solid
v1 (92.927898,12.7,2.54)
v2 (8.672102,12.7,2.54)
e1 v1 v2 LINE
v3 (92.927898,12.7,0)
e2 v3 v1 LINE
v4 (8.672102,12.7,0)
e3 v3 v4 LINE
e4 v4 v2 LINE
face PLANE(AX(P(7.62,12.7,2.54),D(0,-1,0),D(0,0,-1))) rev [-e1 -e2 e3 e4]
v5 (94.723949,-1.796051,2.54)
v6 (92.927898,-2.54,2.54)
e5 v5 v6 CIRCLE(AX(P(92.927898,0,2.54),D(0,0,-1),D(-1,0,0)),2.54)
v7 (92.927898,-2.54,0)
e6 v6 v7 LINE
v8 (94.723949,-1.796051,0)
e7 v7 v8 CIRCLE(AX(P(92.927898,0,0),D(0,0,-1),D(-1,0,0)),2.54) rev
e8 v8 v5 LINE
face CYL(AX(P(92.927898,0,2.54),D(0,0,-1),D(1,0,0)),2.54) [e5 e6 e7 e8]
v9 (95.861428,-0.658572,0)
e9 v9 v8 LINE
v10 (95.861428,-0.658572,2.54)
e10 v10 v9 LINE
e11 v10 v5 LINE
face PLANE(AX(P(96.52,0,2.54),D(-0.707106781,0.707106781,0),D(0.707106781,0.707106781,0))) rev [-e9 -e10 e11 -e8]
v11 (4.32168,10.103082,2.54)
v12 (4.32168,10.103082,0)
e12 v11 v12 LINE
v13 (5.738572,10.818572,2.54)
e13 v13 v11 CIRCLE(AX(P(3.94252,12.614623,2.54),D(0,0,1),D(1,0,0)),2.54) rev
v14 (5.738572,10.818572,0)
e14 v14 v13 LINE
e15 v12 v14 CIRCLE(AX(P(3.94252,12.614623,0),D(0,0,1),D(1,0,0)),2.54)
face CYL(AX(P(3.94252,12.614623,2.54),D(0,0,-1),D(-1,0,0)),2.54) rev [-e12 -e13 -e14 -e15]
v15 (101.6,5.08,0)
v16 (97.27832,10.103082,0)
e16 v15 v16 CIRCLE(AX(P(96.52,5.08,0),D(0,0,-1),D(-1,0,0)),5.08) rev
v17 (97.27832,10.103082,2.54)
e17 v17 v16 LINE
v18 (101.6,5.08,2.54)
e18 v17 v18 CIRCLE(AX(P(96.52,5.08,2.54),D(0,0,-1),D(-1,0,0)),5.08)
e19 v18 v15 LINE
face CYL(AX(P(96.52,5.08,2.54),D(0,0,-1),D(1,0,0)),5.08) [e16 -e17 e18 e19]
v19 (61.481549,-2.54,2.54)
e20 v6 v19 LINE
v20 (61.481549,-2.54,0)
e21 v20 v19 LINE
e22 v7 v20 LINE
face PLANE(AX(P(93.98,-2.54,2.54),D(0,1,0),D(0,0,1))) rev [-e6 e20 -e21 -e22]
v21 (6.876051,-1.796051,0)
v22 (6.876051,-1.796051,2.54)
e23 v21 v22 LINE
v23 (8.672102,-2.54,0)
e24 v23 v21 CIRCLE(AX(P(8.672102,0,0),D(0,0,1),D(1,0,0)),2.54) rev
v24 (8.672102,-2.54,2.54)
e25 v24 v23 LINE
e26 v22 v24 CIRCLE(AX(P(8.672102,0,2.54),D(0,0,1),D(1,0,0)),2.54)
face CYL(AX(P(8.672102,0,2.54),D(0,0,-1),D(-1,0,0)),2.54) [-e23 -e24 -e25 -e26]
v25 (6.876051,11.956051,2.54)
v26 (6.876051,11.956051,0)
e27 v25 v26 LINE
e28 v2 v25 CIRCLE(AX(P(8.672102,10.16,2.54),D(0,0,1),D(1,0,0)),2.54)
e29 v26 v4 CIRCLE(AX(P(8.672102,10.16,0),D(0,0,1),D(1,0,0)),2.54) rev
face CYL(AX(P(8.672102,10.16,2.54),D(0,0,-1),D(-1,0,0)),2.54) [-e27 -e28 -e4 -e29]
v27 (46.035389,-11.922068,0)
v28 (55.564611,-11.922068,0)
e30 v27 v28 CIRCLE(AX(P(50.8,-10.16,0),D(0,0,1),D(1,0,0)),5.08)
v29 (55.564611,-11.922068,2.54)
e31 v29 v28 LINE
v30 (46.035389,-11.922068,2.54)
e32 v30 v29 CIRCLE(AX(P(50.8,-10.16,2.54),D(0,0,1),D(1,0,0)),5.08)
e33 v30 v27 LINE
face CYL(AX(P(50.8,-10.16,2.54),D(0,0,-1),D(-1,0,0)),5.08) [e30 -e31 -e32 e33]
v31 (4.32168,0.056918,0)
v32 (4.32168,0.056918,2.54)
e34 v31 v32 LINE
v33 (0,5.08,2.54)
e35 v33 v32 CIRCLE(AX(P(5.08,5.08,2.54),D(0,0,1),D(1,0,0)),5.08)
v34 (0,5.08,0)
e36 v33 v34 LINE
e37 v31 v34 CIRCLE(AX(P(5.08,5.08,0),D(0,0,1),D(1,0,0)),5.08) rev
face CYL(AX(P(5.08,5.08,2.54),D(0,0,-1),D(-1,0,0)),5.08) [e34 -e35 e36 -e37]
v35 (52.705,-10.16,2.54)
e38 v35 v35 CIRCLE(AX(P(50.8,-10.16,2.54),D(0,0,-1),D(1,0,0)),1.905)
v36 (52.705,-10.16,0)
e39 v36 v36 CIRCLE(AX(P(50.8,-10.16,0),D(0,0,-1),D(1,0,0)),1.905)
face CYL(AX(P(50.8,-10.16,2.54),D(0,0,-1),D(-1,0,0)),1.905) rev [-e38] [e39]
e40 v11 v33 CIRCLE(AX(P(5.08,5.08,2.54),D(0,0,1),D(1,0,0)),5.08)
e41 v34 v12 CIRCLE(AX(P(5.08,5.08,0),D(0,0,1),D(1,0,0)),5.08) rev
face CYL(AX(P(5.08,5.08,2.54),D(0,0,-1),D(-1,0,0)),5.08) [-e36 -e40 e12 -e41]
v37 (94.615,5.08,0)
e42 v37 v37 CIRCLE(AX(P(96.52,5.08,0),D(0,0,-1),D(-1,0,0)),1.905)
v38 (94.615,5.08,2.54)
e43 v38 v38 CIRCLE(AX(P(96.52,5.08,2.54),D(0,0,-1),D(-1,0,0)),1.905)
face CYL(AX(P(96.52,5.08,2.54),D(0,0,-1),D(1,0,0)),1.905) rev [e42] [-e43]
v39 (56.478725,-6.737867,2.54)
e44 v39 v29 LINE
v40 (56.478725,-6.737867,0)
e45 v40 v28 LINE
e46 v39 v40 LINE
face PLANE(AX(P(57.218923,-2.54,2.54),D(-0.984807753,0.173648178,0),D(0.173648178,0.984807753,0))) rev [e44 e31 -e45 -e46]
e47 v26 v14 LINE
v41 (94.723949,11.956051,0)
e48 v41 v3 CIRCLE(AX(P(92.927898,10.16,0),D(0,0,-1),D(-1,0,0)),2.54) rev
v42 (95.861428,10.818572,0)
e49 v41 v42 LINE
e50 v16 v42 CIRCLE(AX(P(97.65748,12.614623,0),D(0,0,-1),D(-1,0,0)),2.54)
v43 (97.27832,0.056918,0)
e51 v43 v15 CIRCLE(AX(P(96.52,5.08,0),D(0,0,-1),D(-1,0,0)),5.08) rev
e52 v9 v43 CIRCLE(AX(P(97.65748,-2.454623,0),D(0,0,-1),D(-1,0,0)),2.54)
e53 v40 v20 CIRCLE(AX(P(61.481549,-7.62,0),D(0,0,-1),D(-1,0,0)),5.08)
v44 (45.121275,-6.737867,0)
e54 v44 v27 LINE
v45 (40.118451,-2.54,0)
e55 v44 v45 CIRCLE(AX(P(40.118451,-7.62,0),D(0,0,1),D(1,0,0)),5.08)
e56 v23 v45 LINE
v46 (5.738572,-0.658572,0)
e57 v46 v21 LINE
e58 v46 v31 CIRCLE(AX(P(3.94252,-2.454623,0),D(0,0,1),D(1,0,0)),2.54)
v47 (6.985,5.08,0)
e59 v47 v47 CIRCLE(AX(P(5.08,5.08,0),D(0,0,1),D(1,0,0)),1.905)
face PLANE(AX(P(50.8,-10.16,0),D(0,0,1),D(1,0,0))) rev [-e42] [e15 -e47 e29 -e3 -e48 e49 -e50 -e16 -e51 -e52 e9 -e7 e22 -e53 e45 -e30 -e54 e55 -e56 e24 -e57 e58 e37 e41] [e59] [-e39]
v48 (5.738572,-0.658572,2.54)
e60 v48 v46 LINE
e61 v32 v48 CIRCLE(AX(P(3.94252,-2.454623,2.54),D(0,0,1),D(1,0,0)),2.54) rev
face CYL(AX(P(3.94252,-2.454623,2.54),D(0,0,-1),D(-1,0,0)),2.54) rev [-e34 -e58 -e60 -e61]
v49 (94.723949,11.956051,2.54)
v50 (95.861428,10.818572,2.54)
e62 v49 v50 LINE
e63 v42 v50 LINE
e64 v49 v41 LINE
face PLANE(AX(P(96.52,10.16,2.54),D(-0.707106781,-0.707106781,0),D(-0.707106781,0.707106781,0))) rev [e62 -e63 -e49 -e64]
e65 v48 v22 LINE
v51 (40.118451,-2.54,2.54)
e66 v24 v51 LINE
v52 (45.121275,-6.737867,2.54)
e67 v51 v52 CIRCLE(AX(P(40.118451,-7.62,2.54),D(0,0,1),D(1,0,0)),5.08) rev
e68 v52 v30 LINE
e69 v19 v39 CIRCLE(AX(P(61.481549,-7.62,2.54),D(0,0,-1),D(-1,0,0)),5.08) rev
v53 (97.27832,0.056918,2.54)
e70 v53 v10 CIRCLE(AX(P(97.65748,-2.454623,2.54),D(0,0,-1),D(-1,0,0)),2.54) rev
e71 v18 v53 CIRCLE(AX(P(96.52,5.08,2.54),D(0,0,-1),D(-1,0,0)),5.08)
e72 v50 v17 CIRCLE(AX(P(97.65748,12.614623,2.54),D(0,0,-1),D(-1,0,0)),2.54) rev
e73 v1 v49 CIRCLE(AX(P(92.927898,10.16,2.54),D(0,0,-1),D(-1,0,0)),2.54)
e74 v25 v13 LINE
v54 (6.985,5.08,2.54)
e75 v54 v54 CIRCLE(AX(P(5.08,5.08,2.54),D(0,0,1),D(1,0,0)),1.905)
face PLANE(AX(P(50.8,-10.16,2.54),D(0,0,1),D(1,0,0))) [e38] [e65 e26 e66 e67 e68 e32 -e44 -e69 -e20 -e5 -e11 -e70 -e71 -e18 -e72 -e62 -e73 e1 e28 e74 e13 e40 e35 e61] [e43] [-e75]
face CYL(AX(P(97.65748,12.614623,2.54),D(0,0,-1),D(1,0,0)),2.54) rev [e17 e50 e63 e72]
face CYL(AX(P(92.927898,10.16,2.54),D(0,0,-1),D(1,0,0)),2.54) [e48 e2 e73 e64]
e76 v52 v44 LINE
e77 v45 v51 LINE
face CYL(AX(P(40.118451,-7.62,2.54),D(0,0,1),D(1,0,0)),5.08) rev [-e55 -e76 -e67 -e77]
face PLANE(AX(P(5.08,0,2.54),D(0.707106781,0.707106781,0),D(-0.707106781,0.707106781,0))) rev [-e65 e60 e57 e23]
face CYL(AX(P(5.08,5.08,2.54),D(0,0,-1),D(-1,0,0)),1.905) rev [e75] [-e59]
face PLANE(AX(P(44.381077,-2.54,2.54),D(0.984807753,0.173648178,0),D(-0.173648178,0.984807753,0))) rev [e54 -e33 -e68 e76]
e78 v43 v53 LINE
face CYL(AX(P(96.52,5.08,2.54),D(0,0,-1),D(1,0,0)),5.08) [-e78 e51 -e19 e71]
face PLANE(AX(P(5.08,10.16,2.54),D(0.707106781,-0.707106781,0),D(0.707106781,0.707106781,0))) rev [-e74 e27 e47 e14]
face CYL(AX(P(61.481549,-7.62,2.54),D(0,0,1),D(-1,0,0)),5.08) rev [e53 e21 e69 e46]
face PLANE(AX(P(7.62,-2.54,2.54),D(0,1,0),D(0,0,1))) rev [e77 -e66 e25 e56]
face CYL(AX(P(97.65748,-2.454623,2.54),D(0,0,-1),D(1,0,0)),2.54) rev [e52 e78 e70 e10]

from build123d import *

# Parameters (mm, degrees)
SKETCH1_R           = 1.905
BOSS_EXTRUDE1_DEPTH = 2.54
FILLET5_R           = 5.08
FILLET6_R           = 2.54


with BuildPart() as part:
    # Sketch1 → Boss-Extrude1 (new body)
    with BuildSketch(Plane.XY):
        with BuildLine():
            Line((5.08, 10.16), (7.62, 12.7))
            Line((7.62, 12.7), (50.8, 12.7))
            Line((50.8, 12.7), (50.8, -2.54))
            Line((50.8, -2.54), (50.8, -8.255))
            ThreePointArc((50.8, -8.255), (48.895, -10.16), (50.8, -12.065))
            Line((50.8, -12.065), (50.8, -15.24))
            ThreePointArc((50.8, -15.24), (47.896976236, -14.328795153), (46.035389215, -11.922068121))
            Line((46.035389215, -11.922068121), (44.38107747, -2.54))
            Line((44.38107747, -2.54), (7.62, -2.54))
            Line((7.62, -2.54), (5.08, 0))
            Line((5.08, 0), (0, 0))
            Line((0, 0), (0, 10.16))
            Line((0, 10.16), (5.08, 10.16))
        make_face()
        with Locations((5.08, 5.08)):
            Circle(SKETCH1_R, mode=Mode.SUBTRACT)
    extrude(amount=BOSS_EXTRUDE1_DEPTH)

    # Fillet5
    fillet5_edges = [part.edges().sort_by_distance(p)[0] for p in [
        (44.38107747, -2.54, 1.27),
        (0, 0, 1.27),
        (0, 10.16, 1.27),
    ]]
    fillet(fillet5_edges, radius=FILLET5_R - 0.0001)  # a hair under: the kernel refuses the full size

    # Fillet6
    fillet6_edges = [part.edges().sort_by_distance(p)[0] for p in [
        (5.08, 10.16, 1.27),
        (7.62, 12.7, 1.27),
        (7.62, -2.54, 1.27),
        (5.08, 0, 1.27),
    ]]
    fillet(fillet6_edges, radius=FILLET6_R)

    # Mirror5: part across plane


with BuildPart() as part_1:
    add(part.part)
    add(part.part.mirror(Plane(origin=(50.8, -2.54, 2.54), x_dir=(0, 0, 1), z_dir=(-1, 0, 0))))


solid = part_1.part
